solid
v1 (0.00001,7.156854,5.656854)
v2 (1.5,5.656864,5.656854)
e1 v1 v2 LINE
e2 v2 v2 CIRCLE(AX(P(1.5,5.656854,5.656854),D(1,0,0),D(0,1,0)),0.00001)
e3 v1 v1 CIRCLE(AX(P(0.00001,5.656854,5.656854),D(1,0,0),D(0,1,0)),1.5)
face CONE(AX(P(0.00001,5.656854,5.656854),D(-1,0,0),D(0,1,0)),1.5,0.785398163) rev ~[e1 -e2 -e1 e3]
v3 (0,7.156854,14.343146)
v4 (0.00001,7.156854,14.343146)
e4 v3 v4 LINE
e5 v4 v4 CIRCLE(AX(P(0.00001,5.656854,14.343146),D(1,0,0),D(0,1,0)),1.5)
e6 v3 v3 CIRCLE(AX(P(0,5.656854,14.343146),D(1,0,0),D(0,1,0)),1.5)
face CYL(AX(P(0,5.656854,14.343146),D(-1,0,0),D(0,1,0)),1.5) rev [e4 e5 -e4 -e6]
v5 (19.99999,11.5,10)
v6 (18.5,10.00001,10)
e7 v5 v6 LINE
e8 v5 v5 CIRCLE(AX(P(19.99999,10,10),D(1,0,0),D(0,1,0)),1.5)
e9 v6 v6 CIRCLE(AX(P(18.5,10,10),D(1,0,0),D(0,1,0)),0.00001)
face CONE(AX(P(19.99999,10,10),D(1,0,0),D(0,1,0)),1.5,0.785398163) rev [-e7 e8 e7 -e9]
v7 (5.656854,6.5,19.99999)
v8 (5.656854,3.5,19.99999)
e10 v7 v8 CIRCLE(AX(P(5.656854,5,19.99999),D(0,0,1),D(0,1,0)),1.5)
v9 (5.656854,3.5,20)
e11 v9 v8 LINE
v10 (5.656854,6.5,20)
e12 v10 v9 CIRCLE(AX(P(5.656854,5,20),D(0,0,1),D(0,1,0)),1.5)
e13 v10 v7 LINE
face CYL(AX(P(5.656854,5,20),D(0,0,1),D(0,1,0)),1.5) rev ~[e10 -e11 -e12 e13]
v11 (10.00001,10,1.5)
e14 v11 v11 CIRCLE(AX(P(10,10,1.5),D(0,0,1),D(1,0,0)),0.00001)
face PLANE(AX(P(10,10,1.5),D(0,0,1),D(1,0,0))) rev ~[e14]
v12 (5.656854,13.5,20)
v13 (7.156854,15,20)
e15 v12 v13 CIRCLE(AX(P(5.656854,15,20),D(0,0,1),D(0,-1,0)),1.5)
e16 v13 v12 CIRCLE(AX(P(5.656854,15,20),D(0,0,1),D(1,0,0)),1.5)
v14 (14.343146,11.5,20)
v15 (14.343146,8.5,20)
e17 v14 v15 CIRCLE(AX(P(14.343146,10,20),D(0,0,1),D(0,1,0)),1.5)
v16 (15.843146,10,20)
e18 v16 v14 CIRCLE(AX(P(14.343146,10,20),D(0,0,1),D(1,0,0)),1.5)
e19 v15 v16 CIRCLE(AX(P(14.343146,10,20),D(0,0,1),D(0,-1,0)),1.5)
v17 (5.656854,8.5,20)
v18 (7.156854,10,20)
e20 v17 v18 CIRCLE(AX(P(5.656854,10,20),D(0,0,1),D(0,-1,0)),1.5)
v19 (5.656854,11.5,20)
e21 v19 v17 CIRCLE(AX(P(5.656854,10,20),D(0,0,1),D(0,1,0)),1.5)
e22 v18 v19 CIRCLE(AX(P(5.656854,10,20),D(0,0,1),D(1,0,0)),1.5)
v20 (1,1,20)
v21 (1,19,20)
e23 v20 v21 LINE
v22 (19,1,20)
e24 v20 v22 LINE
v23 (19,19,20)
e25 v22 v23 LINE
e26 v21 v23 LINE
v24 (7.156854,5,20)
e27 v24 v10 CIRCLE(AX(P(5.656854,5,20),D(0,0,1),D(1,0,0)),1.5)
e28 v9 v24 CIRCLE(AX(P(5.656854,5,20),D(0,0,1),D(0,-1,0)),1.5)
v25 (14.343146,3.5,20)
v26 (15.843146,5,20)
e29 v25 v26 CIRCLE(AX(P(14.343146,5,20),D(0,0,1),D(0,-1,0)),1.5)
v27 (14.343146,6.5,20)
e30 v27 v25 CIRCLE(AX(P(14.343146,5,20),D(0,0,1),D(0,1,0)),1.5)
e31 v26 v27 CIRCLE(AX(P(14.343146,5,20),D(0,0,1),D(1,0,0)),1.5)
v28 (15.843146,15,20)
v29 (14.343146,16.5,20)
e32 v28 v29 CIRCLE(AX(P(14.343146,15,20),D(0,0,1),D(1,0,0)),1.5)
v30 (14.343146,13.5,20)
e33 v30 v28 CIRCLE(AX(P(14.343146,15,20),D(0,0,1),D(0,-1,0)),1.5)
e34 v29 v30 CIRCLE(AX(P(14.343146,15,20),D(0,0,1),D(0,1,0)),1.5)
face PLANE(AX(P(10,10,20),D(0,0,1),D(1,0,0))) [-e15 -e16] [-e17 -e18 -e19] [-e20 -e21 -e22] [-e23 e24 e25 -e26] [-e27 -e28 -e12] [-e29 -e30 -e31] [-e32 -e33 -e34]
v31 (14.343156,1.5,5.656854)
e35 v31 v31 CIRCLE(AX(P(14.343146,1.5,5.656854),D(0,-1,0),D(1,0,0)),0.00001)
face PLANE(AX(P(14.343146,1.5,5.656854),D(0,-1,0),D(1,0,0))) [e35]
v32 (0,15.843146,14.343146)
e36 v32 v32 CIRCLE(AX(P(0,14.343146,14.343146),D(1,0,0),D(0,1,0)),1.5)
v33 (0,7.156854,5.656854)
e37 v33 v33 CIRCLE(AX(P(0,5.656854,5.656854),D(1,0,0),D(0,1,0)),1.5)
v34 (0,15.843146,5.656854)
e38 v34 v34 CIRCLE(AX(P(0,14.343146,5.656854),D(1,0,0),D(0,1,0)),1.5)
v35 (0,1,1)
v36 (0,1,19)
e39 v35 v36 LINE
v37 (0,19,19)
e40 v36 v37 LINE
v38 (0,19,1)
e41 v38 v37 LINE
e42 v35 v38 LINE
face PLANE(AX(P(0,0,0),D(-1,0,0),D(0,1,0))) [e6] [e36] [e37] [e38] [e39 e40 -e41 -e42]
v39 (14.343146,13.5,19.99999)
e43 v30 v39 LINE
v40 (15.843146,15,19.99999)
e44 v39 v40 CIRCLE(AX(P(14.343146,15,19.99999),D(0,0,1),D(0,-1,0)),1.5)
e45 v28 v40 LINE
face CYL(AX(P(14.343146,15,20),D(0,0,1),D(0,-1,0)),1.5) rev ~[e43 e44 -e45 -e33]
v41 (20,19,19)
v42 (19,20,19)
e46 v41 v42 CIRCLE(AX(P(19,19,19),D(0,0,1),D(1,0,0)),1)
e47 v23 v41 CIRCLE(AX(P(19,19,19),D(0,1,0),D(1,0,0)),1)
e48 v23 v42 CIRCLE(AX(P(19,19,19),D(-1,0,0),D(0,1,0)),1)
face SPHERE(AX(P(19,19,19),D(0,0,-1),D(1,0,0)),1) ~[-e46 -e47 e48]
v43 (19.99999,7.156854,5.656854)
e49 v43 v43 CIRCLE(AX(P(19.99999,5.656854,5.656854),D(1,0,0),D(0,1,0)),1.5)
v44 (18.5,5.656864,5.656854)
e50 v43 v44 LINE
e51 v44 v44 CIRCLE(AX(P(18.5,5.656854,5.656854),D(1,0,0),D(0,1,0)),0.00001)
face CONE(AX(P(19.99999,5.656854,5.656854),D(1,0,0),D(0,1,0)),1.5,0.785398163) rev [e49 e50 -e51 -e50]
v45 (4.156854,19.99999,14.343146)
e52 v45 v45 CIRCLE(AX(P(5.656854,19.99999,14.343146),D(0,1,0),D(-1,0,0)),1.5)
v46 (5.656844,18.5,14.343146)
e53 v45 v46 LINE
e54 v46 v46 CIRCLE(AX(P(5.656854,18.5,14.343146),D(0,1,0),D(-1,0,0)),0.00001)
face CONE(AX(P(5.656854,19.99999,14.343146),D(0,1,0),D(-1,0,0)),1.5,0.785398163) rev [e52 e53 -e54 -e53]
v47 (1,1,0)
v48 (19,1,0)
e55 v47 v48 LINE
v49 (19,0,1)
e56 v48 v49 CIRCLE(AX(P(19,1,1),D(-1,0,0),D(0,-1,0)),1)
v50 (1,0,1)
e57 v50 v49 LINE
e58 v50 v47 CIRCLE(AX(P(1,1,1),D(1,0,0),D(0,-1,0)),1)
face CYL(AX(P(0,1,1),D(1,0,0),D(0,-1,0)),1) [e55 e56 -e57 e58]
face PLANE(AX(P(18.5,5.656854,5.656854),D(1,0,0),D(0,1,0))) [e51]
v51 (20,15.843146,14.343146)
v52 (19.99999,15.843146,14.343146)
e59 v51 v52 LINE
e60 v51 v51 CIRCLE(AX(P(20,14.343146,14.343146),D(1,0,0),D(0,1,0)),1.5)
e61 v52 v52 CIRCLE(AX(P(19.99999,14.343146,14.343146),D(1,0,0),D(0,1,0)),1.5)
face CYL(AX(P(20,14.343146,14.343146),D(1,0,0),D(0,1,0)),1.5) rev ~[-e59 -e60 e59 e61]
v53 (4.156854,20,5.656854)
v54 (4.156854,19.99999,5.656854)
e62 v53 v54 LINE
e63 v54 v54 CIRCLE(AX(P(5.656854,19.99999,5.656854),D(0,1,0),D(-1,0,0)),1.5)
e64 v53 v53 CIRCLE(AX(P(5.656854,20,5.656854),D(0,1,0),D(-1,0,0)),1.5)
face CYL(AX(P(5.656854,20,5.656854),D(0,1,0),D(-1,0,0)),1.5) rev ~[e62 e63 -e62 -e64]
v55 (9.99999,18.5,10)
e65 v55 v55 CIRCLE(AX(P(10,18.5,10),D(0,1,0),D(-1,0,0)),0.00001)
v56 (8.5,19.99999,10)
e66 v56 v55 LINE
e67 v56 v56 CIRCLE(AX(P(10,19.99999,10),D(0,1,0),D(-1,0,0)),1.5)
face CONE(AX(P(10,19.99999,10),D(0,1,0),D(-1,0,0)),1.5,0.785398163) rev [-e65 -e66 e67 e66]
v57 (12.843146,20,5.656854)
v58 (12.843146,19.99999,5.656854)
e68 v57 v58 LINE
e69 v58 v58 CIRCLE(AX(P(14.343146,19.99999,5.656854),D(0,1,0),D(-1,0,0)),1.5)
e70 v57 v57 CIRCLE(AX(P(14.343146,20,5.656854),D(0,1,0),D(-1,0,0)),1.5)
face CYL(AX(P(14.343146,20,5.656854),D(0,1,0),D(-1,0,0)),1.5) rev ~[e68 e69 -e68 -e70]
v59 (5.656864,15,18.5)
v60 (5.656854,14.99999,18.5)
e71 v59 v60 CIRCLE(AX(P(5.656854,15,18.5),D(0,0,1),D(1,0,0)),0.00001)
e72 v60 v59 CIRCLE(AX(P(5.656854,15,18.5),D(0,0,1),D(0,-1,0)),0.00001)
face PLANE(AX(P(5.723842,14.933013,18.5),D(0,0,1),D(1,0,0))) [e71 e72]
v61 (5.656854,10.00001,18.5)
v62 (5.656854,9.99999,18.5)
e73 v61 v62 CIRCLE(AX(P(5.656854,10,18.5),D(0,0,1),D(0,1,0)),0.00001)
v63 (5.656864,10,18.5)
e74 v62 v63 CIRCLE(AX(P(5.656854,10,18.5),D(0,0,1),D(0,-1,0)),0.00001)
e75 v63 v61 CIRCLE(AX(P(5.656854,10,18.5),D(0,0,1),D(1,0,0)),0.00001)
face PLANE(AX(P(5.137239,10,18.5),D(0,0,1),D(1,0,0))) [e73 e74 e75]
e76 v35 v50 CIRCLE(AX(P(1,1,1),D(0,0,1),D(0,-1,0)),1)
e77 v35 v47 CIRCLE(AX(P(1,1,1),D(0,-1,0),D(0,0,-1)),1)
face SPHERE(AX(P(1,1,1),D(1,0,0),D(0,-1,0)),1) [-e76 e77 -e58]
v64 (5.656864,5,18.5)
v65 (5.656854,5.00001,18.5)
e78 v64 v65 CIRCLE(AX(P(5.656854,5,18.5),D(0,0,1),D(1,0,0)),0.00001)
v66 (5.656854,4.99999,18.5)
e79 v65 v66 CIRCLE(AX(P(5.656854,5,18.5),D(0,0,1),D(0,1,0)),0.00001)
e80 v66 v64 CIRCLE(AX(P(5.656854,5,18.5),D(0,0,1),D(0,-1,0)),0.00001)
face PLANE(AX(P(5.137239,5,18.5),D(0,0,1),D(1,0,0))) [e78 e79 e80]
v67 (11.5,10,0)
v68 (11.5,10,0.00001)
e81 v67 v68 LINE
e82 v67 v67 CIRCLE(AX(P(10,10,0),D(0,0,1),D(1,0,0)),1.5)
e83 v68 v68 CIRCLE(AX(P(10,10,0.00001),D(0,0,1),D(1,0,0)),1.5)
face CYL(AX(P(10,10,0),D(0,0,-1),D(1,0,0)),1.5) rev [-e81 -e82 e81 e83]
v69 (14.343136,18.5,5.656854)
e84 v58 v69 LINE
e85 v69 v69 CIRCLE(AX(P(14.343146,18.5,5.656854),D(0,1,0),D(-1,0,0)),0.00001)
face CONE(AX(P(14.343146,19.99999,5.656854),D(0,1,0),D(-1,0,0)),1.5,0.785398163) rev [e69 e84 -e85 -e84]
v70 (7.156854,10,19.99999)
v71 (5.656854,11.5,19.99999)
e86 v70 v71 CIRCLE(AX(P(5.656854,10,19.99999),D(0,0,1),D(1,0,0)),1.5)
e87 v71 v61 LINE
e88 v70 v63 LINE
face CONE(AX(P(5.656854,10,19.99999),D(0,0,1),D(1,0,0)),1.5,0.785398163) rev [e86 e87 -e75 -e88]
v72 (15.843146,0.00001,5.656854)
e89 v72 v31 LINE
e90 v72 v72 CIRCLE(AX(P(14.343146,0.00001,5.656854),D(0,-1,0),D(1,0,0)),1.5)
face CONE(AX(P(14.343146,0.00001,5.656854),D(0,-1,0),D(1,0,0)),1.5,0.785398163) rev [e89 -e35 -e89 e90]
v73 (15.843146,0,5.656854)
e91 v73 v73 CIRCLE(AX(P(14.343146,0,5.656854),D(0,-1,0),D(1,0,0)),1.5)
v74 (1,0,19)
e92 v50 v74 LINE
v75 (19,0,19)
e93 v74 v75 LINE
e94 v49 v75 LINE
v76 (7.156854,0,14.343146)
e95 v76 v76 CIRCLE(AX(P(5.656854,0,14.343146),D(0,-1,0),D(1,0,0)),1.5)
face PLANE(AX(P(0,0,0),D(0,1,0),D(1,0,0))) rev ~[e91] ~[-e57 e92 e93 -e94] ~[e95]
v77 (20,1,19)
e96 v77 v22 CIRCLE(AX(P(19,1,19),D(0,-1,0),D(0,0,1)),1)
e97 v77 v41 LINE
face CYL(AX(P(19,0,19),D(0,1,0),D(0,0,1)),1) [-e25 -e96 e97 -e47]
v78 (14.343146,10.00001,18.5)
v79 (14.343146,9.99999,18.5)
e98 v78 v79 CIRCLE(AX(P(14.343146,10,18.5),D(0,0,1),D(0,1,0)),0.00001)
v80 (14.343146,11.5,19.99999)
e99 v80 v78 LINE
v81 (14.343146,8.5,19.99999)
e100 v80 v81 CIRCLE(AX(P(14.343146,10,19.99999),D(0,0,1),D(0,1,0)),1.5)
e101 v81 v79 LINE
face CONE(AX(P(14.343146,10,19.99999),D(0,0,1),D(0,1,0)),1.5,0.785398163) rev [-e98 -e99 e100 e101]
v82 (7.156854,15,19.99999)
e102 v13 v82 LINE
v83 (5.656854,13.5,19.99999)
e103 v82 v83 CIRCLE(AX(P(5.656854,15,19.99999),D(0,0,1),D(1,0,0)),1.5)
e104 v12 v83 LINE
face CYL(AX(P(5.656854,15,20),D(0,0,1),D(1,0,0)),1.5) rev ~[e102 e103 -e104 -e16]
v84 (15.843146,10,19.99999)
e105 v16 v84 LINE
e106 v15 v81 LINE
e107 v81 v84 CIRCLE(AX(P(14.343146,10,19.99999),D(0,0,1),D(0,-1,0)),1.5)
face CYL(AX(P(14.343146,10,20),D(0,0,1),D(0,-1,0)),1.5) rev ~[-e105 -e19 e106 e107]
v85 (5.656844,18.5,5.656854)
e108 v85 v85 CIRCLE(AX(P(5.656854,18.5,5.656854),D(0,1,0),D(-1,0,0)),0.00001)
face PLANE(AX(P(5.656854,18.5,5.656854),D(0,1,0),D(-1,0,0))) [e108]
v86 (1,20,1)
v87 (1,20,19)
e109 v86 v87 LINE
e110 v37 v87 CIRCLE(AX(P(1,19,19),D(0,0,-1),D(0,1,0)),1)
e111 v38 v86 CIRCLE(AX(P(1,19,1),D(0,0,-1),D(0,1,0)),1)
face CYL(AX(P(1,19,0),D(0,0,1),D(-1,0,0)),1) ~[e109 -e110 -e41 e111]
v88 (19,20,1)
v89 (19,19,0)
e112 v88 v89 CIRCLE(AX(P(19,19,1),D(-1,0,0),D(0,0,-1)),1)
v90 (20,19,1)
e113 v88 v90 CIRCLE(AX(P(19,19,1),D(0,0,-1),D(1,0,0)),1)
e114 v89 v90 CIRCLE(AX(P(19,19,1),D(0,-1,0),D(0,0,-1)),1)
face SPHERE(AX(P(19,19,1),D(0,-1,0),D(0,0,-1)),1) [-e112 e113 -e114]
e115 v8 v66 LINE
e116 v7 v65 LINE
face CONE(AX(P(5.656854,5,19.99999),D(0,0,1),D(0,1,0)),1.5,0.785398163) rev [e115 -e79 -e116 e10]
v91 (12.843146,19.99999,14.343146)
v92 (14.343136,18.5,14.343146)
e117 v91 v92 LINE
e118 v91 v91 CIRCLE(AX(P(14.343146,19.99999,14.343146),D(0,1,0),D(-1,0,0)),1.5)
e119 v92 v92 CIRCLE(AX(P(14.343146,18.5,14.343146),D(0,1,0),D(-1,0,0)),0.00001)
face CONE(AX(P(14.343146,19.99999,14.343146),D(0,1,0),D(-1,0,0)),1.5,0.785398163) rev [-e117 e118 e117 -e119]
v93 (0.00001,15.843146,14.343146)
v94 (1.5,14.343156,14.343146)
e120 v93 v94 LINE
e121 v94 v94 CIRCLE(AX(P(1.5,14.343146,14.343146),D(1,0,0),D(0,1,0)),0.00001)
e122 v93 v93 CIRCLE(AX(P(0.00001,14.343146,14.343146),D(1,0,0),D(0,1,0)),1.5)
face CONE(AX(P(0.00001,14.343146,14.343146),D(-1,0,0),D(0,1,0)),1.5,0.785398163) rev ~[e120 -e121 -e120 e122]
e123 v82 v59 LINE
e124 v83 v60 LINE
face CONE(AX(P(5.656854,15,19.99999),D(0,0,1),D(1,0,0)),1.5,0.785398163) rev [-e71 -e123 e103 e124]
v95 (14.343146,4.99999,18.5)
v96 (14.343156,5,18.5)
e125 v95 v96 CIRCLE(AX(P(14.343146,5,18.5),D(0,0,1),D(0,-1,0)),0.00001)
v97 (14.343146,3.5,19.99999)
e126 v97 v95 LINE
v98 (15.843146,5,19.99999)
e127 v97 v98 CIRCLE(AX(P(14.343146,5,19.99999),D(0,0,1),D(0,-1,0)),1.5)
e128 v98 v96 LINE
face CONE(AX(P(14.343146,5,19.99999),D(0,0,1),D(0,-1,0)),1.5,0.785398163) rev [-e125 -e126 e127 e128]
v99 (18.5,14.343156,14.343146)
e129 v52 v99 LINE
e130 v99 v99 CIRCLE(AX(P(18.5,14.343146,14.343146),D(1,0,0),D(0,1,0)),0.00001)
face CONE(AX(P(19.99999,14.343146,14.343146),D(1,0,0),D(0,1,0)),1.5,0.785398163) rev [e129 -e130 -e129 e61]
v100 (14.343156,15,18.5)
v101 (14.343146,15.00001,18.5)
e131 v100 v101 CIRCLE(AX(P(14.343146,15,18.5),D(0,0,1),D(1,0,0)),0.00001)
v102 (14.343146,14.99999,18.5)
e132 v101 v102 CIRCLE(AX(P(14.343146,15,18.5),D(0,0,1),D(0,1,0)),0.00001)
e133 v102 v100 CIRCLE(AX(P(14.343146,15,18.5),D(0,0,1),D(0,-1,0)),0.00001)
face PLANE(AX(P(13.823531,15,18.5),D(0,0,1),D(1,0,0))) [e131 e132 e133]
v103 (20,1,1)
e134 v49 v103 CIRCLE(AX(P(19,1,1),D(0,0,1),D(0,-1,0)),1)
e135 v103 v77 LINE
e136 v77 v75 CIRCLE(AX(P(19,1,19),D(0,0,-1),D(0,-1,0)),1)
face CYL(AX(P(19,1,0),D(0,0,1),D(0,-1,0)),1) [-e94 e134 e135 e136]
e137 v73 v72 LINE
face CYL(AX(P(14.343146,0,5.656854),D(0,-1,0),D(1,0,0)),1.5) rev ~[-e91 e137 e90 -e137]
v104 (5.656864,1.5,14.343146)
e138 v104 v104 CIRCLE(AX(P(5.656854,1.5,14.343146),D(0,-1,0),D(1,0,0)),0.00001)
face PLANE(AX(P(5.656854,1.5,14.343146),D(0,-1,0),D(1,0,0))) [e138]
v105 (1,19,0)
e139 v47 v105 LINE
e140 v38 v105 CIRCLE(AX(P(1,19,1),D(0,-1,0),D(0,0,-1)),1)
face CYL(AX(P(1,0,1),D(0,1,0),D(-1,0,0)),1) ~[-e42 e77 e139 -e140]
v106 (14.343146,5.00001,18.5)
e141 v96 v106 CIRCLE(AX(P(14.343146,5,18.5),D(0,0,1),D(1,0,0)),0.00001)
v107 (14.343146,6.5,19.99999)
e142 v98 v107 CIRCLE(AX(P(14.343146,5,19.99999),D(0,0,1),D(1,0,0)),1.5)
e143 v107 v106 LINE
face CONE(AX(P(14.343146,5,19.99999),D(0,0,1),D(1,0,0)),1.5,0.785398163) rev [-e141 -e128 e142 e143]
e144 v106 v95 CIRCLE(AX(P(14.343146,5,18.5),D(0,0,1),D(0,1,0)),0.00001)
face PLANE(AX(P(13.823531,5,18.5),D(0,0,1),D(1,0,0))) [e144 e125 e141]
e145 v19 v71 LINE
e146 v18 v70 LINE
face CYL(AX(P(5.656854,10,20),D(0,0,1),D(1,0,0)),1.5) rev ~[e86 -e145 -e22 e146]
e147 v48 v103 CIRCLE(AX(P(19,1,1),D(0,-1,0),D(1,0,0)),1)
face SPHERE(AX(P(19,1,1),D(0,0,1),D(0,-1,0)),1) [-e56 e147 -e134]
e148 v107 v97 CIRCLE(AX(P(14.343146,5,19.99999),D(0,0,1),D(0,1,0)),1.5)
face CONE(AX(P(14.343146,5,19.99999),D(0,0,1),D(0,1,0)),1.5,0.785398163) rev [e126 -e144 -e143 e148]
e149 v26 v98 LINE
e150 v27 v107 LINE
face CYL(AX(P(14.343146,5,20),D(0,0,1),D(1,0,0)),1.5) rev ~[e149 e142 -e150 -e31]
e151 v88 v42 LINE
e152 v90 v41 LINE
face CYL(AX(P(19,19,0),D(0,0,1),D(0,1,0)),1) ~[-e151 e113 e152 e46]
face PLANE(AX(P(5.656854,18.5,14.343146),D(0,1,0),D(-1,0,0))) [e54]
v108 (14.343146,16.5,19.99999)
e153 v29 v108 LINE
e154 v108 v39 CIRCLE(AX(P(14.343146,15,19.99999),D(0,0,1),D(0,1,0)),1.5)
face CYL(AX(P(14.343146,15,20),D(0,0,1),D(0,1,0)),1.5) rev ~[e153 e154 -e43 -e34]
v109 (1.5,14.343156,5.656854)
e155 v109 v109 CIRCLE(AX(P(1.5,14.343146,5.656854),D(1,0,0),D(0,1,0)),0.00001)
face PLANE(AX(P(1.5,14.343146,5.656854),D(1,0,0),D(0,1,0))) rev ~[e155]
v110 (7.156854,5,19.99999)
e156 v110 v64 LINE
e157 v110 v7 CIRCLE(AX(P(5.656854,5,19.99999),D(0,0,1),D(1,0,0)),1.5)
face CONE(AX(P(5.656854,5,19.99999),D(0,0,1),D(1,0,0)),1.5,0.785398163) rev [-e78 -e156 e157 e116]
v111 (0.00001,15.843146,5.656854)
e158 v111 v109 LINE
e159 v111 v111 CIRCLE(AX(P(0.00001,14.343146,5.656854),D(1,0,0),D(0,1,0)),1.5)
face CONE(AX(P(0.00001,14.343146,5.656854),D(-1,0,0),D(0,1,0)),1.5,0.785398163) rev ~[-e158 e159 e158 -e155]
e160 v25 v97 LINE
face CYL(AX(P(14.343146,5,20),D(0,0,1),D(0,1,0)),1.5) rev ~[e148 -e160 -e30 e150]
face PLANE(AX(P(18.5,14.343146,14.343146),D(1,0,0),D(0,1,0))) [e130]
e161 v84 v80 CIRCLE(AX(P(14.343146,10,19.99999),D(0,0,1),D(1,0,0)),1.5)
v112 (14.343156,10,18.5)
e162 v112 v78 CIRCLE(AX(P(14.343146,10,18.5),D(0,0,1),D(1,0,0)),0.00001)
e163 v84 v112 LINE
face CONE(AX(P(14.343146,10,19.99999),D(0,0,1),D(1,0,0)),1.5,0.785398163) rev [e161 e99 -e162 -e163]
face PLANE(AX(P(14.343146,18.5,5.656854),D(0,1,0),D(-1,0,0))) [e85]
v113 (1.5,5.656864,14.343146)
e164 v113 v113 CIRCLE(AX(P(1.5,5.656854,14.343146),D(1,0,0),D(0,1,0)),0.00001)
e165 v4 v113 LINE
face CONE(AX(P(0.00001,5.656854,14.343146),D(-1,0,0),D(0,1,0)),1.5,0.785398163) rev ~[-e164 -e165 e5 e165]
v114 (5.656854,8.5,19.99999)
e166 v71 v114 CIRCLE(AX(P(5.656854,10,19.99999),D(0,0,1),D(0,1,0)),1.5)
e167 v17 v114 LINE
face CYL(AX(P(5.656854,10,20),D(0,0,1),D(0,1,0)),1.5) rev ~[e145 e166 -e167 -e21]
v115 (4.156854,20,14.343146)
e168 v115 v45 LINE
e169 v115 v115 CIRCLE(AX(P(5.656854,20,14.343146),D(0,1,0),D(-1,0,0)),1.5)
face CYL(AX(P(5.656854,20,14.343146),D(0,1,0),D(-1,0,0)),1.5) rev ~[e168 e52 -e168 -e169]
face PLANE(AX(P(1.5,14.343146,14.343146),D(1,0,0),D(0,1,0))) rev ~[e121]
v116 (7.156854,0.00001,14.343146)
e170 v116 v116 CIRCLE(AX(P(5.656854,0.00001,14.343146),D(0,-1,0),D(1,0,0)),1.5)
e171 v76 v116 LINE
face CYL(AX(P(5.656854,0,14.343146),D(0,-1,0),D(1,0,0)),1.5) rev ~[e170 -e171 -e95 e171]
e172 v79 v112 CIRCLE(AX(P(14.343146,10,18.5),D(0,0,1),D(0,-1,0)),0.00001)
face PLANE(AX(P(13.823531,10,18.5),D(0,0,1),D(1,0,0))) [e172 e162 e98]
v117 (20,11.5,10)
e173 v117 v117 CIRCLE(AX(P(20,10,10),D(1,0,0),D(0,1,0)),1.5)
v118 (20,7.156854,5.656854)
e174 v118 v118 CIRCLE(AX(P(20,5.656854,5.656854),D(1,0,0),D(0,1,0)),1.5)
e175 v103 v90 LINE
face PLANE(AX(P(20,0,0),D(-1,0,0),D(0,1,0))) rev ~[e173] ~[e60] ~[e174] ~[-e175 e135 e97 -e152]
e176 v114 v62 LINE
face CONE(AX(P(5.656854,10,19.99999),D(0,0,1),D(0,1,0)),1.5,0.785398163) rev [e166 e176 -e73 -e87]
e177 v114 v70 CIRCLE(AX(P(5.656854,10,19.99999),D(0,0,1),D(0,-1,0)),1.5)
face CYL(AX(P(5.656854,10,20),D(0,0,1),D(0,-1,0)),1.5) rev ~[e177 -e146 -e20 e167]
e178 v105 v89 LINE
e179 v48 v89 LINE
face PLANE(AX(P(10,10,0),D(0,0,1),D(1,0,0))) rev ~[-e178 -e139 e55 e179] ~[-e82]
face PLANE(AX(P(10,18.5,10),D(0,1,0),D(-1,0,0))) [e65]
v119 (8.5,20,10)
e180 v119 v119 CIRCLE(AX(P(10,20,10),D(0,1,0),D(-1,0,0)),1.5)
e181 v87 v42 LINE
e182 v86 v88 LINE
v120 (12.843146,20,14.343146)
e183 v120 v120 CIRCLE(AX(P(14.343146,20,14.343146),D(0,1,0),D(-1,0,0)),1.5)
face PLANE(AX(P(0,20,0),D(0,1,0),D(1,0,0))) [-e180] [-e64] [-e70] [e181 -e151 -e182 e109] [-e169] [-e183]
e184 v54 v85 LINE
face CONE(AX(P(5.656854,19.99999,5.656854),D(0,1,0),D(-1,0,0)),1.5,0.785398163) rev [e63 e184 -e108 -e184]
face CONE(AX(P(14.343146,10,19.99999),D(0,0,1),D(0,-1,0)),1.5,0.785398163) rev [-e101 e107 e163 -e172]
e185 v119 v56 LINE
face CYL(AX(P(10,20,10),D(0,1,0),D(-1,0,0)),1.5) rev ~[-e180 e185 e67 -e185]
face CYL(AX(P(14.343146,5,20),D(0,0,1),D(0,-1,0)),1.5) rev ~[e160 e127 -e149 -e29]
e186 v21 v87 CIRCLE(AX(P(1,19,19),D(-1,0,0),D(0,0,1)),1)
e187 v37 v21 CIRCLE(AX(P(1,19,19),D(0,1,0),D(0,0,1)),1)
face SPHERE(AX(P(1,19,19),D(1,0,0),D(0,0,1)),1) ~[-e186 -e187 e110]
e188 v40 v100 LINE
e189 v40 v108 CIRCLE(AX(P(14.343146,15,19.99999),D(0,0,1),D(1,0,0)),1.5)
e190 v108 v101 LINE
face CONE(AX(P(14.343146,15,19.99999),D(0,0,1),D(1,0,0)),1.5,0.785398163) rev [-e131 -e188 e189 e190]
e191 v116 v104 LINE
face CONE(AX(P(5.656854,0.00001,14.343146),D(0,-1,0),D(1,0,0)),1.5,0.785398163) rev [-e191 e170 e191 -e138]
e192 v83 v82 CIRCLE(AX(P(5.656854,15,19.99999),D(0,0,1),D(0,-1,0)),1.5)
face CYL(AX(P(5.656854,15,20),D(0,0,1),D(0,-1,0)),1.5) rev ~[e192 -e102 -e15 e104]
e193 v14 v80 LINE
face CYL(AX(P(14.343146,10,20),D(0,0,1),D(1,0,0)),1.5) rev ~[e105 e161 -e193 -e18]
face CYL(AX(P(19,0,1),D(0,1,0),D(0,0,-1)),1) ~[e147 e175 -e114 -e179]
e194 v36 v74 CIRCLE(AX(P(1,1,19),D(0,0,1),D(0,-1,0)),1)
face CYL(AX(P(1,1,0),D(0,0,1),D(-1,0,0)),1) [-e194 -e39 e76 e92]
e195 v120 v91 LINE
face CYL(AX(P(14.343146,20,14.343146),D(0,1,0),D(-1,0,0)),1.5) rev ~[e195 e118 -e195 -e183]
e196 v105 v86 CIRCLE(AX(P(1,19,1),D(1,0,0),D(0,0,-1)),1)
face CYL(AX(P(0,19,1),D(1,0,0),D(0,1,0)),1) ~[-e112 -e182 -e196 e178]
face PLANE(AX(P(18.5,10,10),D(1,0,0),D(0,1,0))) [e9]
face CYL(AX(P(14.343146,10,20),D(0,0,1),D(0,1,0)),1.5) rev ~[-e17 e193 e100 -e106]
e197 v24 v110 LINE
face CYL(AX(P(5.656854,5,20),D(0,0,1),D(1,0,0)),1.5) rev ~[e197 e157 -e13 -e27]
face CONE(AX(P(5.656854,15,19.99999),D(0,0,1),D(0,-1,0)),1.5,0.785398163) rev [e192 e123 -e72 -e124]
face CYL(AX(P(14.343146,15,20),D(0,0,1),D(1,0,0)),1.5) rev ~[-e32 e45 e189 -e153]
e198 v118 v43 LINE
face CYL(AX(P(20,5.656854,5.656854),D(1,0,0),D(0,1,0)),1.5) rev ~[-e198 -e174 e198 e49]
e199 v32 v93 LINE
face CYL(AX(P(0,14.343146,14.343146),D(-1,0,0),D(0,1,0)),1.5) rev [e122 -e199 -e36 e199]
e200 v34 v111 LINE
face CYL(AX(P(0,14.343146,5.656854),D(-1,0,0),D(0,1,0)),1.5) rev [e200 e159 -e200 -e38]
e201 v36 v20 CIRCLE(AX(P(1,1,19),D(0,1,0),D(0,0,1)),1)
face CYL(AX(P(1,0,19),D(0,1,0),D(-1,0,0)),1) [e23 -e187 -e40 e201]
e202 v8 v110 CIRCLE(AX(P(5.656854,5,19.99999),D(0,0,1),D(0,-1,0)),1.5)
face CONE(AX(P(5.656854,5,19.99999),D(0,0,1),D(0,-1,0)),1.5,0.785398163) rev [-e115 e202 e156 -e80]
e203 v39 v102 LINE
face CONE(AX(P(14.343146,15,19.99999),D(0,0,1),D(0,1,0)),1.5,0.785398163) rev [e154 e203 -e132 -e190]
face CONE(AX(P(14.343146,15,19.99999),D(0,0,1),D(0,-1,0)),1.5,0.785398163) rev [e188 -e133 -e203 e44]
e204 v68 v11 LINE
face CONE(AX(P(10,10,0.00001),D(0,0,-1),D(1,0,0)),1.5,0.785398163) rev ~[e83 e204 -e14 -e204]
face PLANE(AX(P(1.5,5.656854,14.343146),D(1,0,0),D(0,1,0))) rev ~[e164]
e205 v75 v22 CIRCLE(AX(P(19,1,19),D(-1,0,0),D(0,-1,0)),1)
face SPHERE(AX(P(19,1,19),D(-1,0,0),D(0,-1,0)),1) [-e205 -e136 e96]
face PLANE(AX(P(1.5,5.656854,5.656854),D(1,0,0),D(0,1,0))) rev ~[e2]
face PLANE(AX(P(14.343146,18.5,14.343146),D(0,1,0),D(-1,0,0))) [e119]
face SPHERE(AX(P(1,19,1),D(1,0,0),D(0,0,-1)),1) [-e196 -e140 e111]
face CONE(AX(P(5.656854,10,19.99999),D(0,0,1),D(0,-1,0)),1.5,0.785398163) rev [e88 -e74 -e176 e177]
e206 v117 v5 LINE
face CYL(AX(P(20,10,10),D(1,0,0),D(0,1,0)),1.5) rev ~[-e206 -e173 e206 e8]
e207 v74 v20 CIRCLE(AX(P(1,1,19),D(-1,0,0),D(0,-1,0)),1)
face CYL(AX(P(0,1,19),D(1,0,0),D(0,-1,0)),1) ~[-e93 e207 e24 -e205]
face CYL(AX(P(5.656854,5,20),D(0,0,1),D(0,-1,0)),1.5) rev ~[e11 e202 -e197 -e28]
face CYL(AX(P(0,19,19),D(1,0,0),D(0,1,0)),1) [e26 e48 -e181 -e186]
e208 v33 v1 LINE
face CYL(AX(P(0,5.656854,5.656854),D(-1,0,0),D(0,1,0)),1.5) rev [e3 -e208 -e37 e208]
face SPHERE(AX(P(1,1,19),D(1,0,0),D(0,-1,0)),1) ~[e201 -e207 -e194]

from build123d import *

# Parameters (mm, degrees)
F0_W      = 20
F0_H      = 20
F1_DEPTH  = 20
F2_R      = 1.5
F3_DEPTH  = 1.5
F4_R      = 1
F5_R      = 1.5
F6_DEPTH  = 1.5
F7_R      = 1.5
F8_DEPTH  = 1.5
F9_SIZE   = 1.49999
F10_SIZE  = 1.49999
F11_SIZE  = 1.49999
F12_R     = 1.5
F13_DEPTH = 1.5
F14_SIZE  = 1.49999
F15_R     = 1.5
F16_DEPTH = 1.5
F17_SIZE  = 1.49999
F19_DEPTH = 1.5
F20_SIZE  = 1.49999


# Not quite as in the source:
# - a fillet or chamfer is up to 0.001 mm smaller than in the source, because OpenCascade refuses the exact size


with BuildPart() as f1:
    # F0 (on Top) → F1 (new body)
    with BuildSketch(Plane.XY):
        with Locations((10, 10)):
            Rectangle(F0_W, F0_H)
    extrude(amount=F1_DEPTH)

    # F2 (on face) → F3 (cut)
    with BuildSketch(Plane.XZ):
        with Locations((5.6568542495, 14.3431457505)):
            Circle(F2_R)
        with Locations((14.3431457505, 5.6568542495)):
            Circle(F2_R)
    extrude(amount=-F3_DEPTH, mode=Mode.SUBTRACT)

    # F4
    f4_edges = [f1.edges().sort_by_distance(p)[0] for p in [
        (10, 0, 20),
        (20, 0, 10),
        (10, 0, 0),
        (0, 0, 10),
        (20, 10, 0),
        (10, 20, 0),
        (0, 10, 0),
        (20, 20, 10),
        (20, 10, 20),
        (10, 20, 20),
        (0, 10, 20),
        (0, 20, 10),
    ]]
    fillet(f4_edges, radius=F4_R)

    # F5 (on face) → F6 (cut)
    with BuildSketch(Plane.XY):
        with Locations((10, 10)):
            Circle(F5_R)
    extrude(amount=F6_DEPTH, mode=Mode.SUBTRACT)

    # F7 (on Right) → F8 (cut)
    with BuildSketch(Plane.YZ):
        with Locations((5.6568542495, 14.3431457505)):
            Circle(F7_R)
        with Locations((14.3431457505, 14.3431457505)):
            Circle(F7_R)
        with Locations((14.3431457505, 5.6568542495)):
            Circle(F7_R)
        with Locations((5.6568542495, 5.6568542495)):
            Circle(F7_R)
    extrude(amount=F8_DEPTH, mode=Mode.SUBTRACT)

    # F9 (size 1.5 in the source; OpenCascade refuses exactly that, so slightly less here)
    f9_edges = [f1.edges().sort_by_distance(p)[0] for p in [
        (4.156854, 1.5, 14.343146),
        (12.843146, 1.5, 5.656854),
    ]]
    chamfer(f9_edges, length=F9_SIZE)

    # F10 (size 1.5 in the source; OpenCascade refuses exactly that, so slightly less here)
    f10_edges = [f1.edges().sort_by_distance(p)[0] for p in [
        (1.5, 12.843146, 14.343146),
        (1.5, 4.156854, 14.343146),
        (1.5, 4.156854, 5.656854),
        (1.5, 12.843146, 5.656854),
    ]]
    chamfer(f10_edges, length=F10_SIZE)

    # F11 (size 1.5 in the source; OpenCascade refuses exactly that, so slightly less here)
    f11_edges = [f1.edges().sort_by_distance(p)[0] for p in [
        (8.5, 10, 1.5),
    ]]
    chamfer(f11_edges, length=F11_SIZE)

    # F12 (on face) → F13 (cut)
    with BuildSketch(Plane.YZ.offset(20)):
        with Locations((5.6568542495, 5.6568542495)):
            Circle(F12_R)
        with Locations((10, 10)):
            Circle(F12_R)
        with Locations((14.3431457505, 14.3431457505)):
            Circle(F12_R)
    extrude(amount=-F13_DEPTH, mode=Mode.SUBTRACT)

    # F14 (size 1.5 in the source; OpenCascade refuses exactly that, so slightly less here)
    f14_edges = [f1.edges().sort_by_distance(p)[0] for p in [
        (18.5, 8.5, 10),
        (18.5, 12.843146, 14.343146),
        (18.5, 4.156854, 5.656854),
    ]]
    chamfer(f14_edges, length=F14_SIZE)

    # F15 (on face) → F16 (cut)
    with BuildSketch(Plane(origin=(0, 20, 0), x_dir=(-1, 0, 0), z_dir=(0, 1, 0))):
        with Locations((-14.3431457505, 14.3431457505)):
            Circle(F15_R)
        with Locations((-5.6568542495, 5.6568542495)):
            Circle(F15_R)
        with Locations((-14.3431457505, 5.6568542495)):
            Circle(F15_R)
        with Locations((-5.6568542495, 14.3431457505)):
            Circle(F15_R)
        with Locations((-10, 10)):
            Circle(F15_R)
    extrude(amount=-F16_DEPTH, mode=Mode.SUBTRACT)

    # F17 (size 1.5 in the source; OpenCascade refuses exactly that, so slightly less here)
    f17_edges = [f1.edges().sort_by_distance(p)[0] for p in [
        (15.843146, 18.5, 14.343146),
        (7.156854, 18.5, 14.343146),
        (11.5, 18.5, 10),
        (15.843146, 18.5, 5.656854),
        (7.156854, 18.5, 5.656854),
    ]]
    chamfer(f17_edges, length=F17_SIZE)

    # F18 (on face) → F19 (cut)
    with BuildSketch(Plane.XY.offset(20)):
        with BuildLine():
            ThreePointArc((7.1568542495, 15), (4.5961940777, 16.0606601718), (5.6568542495, 13.5))
            ThreePointArc((5.6568542495, 13.5), (6.7175144213, 13.9393398282), (7.1568542495, 15))
        make_face()
        with BuildLine():
            ThreePointArc((5.6568542495, 11.5), (4.1568542495, 10), (5.6568542495, 8.5))
            Line((5.6568542495, 8.5), (5.6568542495, 10))
            Line((5.6568542495, 10), (5.6568542495, 11.5))
        make_face()
        with BuildLine():
            Line((5.6568542495, 10), (5.6568542495, 8.5))
            ThreePointArc((5.6568542495, 8.5), (6.7175144213, 8.9393398282), (7.1568542495, 10))
            ThreePointArc((7.1568542495, 10), (6.7175144213, 11.0606601718), (5.6568542495, 11.5))
            Line((5.6568542495, 11.5), (5.6568542495, 10))
        make_face()
        with BuildLine():
            ThreePointArc((5.6568542495, 6.5), (4.1568542495, 5), (5.6568542495, 3.5))
            Line((5.6568542495, 3.5), (5.6568542495, 5))
            Line((5.6568542495, 5), (5.6568542495, 6.5))
        make_face()
        with BuildLine():
            Line((5.6568542495, 5), (5.6568542495, 3.5))
            ThreePointArc((5.6568542495, 3.5), (6.7175144213, 3.9393398282), (7.1568542495, 5))
            ThreePointArc((7.1568542495, 5), (6.7175144213, 6.0606601718), (5.6568542495, 6.5))
            Line((5.6568542495, 6.5), (5.6568542495, 5))
        make_face()
        with BuildLine():
            ThreePointArc((14.3431457505, 16.5), (12.8431457505, 15), (14.3431457505, 13.5))
            Line((14.3431457505, 13.5), (14.3431457505, 15))
            Line((14.3431457505, 15), (14.3431457505, 16.5))
        make_face()
        with BuildLine():
            Line((14.3431457505, 15), (14.3431457505, 13.5))
            ThreePointArc((14.3431457505, 13.5), (15.4038059223, 13.9393398282), (15.8431457505, 15))
            ThreePointArc((15.8431457505, 15), (15.4038059223, 16.0606601718), (14.3431457505, 16.5))
            Line((14.3431457505, 16.5), (14.3431457505, 15))
        make_face()
        with BuildLine():
            ThreePointArc((14.3431457505, 11.5), (12.8431457505, 10), (14.3431457505, 8.5))
            Line((14.3431457505, 8.5), (14.3431457505, 10))
            Line((14.3431457505, 10), (14.3431457505, 11.5))
        make_face()
        with BuildLine():
            Line((14.3431457505, 10), (14.3431457505, 8.5))
            ThreePointArc((14.3431457505, 8.5), (15.4038059223, 8.9393398282), (15.8431457505, 10))
            ThreePointArc((15.8431457505, 10), (15.4038059223, 11.0606601718), (14.3431457505, 11.5))
            Line((14.3431457505, 11.5), (14.3431457505, 10))
        make_face()
        with BuildLine():
            ThreePointArc((14.3431457505, 6.5), (12.8431457505, 5), (14.3431457505, 3.5))
            Line((14.3431457505, 3.5), (14.3431457505, 5))
            Line((14.3431457505, 5), (14.3431457505, 6.5))
        make_face()
        with BuildLine():
            Line((14.3431457505, 5), (14.3431457505, 3.5))
            ThreePointArc((14.3431457505, 3.5), (15.4038059223, 3.9393398282), (15.8431457505, 5))
            ThreePointArc((15.8431457505, 5), (15.4038059223, 6.0606601718), (14.3431457505, 6.5))
            Line((14.3431457505, 6.5), (14.3431457505, 5))
        make_face()
    extrude(amount=-F19_DEPTH, mode=Mode.SUBTRACT)

    # F20 (size 1.5 in the source; OpenCascade refuses exactly that, so slightly less here)
    f20_edges = [f1.edges().sort_by_distance(p)[0] for p in [
        (5.656854, 6.5, 18.5),
        (5.656854, 11.5, 18.5),
        (5.656854, 16.5, 18.5),
        (14.343146, 16.5, 18.5),
        (14.343146, 6.5, 18.5),
        (14.343146, 11.5, 18.5),
    ]]
    chamfer(f20_edges, length=F20_SIZE)


solid = f1.part
